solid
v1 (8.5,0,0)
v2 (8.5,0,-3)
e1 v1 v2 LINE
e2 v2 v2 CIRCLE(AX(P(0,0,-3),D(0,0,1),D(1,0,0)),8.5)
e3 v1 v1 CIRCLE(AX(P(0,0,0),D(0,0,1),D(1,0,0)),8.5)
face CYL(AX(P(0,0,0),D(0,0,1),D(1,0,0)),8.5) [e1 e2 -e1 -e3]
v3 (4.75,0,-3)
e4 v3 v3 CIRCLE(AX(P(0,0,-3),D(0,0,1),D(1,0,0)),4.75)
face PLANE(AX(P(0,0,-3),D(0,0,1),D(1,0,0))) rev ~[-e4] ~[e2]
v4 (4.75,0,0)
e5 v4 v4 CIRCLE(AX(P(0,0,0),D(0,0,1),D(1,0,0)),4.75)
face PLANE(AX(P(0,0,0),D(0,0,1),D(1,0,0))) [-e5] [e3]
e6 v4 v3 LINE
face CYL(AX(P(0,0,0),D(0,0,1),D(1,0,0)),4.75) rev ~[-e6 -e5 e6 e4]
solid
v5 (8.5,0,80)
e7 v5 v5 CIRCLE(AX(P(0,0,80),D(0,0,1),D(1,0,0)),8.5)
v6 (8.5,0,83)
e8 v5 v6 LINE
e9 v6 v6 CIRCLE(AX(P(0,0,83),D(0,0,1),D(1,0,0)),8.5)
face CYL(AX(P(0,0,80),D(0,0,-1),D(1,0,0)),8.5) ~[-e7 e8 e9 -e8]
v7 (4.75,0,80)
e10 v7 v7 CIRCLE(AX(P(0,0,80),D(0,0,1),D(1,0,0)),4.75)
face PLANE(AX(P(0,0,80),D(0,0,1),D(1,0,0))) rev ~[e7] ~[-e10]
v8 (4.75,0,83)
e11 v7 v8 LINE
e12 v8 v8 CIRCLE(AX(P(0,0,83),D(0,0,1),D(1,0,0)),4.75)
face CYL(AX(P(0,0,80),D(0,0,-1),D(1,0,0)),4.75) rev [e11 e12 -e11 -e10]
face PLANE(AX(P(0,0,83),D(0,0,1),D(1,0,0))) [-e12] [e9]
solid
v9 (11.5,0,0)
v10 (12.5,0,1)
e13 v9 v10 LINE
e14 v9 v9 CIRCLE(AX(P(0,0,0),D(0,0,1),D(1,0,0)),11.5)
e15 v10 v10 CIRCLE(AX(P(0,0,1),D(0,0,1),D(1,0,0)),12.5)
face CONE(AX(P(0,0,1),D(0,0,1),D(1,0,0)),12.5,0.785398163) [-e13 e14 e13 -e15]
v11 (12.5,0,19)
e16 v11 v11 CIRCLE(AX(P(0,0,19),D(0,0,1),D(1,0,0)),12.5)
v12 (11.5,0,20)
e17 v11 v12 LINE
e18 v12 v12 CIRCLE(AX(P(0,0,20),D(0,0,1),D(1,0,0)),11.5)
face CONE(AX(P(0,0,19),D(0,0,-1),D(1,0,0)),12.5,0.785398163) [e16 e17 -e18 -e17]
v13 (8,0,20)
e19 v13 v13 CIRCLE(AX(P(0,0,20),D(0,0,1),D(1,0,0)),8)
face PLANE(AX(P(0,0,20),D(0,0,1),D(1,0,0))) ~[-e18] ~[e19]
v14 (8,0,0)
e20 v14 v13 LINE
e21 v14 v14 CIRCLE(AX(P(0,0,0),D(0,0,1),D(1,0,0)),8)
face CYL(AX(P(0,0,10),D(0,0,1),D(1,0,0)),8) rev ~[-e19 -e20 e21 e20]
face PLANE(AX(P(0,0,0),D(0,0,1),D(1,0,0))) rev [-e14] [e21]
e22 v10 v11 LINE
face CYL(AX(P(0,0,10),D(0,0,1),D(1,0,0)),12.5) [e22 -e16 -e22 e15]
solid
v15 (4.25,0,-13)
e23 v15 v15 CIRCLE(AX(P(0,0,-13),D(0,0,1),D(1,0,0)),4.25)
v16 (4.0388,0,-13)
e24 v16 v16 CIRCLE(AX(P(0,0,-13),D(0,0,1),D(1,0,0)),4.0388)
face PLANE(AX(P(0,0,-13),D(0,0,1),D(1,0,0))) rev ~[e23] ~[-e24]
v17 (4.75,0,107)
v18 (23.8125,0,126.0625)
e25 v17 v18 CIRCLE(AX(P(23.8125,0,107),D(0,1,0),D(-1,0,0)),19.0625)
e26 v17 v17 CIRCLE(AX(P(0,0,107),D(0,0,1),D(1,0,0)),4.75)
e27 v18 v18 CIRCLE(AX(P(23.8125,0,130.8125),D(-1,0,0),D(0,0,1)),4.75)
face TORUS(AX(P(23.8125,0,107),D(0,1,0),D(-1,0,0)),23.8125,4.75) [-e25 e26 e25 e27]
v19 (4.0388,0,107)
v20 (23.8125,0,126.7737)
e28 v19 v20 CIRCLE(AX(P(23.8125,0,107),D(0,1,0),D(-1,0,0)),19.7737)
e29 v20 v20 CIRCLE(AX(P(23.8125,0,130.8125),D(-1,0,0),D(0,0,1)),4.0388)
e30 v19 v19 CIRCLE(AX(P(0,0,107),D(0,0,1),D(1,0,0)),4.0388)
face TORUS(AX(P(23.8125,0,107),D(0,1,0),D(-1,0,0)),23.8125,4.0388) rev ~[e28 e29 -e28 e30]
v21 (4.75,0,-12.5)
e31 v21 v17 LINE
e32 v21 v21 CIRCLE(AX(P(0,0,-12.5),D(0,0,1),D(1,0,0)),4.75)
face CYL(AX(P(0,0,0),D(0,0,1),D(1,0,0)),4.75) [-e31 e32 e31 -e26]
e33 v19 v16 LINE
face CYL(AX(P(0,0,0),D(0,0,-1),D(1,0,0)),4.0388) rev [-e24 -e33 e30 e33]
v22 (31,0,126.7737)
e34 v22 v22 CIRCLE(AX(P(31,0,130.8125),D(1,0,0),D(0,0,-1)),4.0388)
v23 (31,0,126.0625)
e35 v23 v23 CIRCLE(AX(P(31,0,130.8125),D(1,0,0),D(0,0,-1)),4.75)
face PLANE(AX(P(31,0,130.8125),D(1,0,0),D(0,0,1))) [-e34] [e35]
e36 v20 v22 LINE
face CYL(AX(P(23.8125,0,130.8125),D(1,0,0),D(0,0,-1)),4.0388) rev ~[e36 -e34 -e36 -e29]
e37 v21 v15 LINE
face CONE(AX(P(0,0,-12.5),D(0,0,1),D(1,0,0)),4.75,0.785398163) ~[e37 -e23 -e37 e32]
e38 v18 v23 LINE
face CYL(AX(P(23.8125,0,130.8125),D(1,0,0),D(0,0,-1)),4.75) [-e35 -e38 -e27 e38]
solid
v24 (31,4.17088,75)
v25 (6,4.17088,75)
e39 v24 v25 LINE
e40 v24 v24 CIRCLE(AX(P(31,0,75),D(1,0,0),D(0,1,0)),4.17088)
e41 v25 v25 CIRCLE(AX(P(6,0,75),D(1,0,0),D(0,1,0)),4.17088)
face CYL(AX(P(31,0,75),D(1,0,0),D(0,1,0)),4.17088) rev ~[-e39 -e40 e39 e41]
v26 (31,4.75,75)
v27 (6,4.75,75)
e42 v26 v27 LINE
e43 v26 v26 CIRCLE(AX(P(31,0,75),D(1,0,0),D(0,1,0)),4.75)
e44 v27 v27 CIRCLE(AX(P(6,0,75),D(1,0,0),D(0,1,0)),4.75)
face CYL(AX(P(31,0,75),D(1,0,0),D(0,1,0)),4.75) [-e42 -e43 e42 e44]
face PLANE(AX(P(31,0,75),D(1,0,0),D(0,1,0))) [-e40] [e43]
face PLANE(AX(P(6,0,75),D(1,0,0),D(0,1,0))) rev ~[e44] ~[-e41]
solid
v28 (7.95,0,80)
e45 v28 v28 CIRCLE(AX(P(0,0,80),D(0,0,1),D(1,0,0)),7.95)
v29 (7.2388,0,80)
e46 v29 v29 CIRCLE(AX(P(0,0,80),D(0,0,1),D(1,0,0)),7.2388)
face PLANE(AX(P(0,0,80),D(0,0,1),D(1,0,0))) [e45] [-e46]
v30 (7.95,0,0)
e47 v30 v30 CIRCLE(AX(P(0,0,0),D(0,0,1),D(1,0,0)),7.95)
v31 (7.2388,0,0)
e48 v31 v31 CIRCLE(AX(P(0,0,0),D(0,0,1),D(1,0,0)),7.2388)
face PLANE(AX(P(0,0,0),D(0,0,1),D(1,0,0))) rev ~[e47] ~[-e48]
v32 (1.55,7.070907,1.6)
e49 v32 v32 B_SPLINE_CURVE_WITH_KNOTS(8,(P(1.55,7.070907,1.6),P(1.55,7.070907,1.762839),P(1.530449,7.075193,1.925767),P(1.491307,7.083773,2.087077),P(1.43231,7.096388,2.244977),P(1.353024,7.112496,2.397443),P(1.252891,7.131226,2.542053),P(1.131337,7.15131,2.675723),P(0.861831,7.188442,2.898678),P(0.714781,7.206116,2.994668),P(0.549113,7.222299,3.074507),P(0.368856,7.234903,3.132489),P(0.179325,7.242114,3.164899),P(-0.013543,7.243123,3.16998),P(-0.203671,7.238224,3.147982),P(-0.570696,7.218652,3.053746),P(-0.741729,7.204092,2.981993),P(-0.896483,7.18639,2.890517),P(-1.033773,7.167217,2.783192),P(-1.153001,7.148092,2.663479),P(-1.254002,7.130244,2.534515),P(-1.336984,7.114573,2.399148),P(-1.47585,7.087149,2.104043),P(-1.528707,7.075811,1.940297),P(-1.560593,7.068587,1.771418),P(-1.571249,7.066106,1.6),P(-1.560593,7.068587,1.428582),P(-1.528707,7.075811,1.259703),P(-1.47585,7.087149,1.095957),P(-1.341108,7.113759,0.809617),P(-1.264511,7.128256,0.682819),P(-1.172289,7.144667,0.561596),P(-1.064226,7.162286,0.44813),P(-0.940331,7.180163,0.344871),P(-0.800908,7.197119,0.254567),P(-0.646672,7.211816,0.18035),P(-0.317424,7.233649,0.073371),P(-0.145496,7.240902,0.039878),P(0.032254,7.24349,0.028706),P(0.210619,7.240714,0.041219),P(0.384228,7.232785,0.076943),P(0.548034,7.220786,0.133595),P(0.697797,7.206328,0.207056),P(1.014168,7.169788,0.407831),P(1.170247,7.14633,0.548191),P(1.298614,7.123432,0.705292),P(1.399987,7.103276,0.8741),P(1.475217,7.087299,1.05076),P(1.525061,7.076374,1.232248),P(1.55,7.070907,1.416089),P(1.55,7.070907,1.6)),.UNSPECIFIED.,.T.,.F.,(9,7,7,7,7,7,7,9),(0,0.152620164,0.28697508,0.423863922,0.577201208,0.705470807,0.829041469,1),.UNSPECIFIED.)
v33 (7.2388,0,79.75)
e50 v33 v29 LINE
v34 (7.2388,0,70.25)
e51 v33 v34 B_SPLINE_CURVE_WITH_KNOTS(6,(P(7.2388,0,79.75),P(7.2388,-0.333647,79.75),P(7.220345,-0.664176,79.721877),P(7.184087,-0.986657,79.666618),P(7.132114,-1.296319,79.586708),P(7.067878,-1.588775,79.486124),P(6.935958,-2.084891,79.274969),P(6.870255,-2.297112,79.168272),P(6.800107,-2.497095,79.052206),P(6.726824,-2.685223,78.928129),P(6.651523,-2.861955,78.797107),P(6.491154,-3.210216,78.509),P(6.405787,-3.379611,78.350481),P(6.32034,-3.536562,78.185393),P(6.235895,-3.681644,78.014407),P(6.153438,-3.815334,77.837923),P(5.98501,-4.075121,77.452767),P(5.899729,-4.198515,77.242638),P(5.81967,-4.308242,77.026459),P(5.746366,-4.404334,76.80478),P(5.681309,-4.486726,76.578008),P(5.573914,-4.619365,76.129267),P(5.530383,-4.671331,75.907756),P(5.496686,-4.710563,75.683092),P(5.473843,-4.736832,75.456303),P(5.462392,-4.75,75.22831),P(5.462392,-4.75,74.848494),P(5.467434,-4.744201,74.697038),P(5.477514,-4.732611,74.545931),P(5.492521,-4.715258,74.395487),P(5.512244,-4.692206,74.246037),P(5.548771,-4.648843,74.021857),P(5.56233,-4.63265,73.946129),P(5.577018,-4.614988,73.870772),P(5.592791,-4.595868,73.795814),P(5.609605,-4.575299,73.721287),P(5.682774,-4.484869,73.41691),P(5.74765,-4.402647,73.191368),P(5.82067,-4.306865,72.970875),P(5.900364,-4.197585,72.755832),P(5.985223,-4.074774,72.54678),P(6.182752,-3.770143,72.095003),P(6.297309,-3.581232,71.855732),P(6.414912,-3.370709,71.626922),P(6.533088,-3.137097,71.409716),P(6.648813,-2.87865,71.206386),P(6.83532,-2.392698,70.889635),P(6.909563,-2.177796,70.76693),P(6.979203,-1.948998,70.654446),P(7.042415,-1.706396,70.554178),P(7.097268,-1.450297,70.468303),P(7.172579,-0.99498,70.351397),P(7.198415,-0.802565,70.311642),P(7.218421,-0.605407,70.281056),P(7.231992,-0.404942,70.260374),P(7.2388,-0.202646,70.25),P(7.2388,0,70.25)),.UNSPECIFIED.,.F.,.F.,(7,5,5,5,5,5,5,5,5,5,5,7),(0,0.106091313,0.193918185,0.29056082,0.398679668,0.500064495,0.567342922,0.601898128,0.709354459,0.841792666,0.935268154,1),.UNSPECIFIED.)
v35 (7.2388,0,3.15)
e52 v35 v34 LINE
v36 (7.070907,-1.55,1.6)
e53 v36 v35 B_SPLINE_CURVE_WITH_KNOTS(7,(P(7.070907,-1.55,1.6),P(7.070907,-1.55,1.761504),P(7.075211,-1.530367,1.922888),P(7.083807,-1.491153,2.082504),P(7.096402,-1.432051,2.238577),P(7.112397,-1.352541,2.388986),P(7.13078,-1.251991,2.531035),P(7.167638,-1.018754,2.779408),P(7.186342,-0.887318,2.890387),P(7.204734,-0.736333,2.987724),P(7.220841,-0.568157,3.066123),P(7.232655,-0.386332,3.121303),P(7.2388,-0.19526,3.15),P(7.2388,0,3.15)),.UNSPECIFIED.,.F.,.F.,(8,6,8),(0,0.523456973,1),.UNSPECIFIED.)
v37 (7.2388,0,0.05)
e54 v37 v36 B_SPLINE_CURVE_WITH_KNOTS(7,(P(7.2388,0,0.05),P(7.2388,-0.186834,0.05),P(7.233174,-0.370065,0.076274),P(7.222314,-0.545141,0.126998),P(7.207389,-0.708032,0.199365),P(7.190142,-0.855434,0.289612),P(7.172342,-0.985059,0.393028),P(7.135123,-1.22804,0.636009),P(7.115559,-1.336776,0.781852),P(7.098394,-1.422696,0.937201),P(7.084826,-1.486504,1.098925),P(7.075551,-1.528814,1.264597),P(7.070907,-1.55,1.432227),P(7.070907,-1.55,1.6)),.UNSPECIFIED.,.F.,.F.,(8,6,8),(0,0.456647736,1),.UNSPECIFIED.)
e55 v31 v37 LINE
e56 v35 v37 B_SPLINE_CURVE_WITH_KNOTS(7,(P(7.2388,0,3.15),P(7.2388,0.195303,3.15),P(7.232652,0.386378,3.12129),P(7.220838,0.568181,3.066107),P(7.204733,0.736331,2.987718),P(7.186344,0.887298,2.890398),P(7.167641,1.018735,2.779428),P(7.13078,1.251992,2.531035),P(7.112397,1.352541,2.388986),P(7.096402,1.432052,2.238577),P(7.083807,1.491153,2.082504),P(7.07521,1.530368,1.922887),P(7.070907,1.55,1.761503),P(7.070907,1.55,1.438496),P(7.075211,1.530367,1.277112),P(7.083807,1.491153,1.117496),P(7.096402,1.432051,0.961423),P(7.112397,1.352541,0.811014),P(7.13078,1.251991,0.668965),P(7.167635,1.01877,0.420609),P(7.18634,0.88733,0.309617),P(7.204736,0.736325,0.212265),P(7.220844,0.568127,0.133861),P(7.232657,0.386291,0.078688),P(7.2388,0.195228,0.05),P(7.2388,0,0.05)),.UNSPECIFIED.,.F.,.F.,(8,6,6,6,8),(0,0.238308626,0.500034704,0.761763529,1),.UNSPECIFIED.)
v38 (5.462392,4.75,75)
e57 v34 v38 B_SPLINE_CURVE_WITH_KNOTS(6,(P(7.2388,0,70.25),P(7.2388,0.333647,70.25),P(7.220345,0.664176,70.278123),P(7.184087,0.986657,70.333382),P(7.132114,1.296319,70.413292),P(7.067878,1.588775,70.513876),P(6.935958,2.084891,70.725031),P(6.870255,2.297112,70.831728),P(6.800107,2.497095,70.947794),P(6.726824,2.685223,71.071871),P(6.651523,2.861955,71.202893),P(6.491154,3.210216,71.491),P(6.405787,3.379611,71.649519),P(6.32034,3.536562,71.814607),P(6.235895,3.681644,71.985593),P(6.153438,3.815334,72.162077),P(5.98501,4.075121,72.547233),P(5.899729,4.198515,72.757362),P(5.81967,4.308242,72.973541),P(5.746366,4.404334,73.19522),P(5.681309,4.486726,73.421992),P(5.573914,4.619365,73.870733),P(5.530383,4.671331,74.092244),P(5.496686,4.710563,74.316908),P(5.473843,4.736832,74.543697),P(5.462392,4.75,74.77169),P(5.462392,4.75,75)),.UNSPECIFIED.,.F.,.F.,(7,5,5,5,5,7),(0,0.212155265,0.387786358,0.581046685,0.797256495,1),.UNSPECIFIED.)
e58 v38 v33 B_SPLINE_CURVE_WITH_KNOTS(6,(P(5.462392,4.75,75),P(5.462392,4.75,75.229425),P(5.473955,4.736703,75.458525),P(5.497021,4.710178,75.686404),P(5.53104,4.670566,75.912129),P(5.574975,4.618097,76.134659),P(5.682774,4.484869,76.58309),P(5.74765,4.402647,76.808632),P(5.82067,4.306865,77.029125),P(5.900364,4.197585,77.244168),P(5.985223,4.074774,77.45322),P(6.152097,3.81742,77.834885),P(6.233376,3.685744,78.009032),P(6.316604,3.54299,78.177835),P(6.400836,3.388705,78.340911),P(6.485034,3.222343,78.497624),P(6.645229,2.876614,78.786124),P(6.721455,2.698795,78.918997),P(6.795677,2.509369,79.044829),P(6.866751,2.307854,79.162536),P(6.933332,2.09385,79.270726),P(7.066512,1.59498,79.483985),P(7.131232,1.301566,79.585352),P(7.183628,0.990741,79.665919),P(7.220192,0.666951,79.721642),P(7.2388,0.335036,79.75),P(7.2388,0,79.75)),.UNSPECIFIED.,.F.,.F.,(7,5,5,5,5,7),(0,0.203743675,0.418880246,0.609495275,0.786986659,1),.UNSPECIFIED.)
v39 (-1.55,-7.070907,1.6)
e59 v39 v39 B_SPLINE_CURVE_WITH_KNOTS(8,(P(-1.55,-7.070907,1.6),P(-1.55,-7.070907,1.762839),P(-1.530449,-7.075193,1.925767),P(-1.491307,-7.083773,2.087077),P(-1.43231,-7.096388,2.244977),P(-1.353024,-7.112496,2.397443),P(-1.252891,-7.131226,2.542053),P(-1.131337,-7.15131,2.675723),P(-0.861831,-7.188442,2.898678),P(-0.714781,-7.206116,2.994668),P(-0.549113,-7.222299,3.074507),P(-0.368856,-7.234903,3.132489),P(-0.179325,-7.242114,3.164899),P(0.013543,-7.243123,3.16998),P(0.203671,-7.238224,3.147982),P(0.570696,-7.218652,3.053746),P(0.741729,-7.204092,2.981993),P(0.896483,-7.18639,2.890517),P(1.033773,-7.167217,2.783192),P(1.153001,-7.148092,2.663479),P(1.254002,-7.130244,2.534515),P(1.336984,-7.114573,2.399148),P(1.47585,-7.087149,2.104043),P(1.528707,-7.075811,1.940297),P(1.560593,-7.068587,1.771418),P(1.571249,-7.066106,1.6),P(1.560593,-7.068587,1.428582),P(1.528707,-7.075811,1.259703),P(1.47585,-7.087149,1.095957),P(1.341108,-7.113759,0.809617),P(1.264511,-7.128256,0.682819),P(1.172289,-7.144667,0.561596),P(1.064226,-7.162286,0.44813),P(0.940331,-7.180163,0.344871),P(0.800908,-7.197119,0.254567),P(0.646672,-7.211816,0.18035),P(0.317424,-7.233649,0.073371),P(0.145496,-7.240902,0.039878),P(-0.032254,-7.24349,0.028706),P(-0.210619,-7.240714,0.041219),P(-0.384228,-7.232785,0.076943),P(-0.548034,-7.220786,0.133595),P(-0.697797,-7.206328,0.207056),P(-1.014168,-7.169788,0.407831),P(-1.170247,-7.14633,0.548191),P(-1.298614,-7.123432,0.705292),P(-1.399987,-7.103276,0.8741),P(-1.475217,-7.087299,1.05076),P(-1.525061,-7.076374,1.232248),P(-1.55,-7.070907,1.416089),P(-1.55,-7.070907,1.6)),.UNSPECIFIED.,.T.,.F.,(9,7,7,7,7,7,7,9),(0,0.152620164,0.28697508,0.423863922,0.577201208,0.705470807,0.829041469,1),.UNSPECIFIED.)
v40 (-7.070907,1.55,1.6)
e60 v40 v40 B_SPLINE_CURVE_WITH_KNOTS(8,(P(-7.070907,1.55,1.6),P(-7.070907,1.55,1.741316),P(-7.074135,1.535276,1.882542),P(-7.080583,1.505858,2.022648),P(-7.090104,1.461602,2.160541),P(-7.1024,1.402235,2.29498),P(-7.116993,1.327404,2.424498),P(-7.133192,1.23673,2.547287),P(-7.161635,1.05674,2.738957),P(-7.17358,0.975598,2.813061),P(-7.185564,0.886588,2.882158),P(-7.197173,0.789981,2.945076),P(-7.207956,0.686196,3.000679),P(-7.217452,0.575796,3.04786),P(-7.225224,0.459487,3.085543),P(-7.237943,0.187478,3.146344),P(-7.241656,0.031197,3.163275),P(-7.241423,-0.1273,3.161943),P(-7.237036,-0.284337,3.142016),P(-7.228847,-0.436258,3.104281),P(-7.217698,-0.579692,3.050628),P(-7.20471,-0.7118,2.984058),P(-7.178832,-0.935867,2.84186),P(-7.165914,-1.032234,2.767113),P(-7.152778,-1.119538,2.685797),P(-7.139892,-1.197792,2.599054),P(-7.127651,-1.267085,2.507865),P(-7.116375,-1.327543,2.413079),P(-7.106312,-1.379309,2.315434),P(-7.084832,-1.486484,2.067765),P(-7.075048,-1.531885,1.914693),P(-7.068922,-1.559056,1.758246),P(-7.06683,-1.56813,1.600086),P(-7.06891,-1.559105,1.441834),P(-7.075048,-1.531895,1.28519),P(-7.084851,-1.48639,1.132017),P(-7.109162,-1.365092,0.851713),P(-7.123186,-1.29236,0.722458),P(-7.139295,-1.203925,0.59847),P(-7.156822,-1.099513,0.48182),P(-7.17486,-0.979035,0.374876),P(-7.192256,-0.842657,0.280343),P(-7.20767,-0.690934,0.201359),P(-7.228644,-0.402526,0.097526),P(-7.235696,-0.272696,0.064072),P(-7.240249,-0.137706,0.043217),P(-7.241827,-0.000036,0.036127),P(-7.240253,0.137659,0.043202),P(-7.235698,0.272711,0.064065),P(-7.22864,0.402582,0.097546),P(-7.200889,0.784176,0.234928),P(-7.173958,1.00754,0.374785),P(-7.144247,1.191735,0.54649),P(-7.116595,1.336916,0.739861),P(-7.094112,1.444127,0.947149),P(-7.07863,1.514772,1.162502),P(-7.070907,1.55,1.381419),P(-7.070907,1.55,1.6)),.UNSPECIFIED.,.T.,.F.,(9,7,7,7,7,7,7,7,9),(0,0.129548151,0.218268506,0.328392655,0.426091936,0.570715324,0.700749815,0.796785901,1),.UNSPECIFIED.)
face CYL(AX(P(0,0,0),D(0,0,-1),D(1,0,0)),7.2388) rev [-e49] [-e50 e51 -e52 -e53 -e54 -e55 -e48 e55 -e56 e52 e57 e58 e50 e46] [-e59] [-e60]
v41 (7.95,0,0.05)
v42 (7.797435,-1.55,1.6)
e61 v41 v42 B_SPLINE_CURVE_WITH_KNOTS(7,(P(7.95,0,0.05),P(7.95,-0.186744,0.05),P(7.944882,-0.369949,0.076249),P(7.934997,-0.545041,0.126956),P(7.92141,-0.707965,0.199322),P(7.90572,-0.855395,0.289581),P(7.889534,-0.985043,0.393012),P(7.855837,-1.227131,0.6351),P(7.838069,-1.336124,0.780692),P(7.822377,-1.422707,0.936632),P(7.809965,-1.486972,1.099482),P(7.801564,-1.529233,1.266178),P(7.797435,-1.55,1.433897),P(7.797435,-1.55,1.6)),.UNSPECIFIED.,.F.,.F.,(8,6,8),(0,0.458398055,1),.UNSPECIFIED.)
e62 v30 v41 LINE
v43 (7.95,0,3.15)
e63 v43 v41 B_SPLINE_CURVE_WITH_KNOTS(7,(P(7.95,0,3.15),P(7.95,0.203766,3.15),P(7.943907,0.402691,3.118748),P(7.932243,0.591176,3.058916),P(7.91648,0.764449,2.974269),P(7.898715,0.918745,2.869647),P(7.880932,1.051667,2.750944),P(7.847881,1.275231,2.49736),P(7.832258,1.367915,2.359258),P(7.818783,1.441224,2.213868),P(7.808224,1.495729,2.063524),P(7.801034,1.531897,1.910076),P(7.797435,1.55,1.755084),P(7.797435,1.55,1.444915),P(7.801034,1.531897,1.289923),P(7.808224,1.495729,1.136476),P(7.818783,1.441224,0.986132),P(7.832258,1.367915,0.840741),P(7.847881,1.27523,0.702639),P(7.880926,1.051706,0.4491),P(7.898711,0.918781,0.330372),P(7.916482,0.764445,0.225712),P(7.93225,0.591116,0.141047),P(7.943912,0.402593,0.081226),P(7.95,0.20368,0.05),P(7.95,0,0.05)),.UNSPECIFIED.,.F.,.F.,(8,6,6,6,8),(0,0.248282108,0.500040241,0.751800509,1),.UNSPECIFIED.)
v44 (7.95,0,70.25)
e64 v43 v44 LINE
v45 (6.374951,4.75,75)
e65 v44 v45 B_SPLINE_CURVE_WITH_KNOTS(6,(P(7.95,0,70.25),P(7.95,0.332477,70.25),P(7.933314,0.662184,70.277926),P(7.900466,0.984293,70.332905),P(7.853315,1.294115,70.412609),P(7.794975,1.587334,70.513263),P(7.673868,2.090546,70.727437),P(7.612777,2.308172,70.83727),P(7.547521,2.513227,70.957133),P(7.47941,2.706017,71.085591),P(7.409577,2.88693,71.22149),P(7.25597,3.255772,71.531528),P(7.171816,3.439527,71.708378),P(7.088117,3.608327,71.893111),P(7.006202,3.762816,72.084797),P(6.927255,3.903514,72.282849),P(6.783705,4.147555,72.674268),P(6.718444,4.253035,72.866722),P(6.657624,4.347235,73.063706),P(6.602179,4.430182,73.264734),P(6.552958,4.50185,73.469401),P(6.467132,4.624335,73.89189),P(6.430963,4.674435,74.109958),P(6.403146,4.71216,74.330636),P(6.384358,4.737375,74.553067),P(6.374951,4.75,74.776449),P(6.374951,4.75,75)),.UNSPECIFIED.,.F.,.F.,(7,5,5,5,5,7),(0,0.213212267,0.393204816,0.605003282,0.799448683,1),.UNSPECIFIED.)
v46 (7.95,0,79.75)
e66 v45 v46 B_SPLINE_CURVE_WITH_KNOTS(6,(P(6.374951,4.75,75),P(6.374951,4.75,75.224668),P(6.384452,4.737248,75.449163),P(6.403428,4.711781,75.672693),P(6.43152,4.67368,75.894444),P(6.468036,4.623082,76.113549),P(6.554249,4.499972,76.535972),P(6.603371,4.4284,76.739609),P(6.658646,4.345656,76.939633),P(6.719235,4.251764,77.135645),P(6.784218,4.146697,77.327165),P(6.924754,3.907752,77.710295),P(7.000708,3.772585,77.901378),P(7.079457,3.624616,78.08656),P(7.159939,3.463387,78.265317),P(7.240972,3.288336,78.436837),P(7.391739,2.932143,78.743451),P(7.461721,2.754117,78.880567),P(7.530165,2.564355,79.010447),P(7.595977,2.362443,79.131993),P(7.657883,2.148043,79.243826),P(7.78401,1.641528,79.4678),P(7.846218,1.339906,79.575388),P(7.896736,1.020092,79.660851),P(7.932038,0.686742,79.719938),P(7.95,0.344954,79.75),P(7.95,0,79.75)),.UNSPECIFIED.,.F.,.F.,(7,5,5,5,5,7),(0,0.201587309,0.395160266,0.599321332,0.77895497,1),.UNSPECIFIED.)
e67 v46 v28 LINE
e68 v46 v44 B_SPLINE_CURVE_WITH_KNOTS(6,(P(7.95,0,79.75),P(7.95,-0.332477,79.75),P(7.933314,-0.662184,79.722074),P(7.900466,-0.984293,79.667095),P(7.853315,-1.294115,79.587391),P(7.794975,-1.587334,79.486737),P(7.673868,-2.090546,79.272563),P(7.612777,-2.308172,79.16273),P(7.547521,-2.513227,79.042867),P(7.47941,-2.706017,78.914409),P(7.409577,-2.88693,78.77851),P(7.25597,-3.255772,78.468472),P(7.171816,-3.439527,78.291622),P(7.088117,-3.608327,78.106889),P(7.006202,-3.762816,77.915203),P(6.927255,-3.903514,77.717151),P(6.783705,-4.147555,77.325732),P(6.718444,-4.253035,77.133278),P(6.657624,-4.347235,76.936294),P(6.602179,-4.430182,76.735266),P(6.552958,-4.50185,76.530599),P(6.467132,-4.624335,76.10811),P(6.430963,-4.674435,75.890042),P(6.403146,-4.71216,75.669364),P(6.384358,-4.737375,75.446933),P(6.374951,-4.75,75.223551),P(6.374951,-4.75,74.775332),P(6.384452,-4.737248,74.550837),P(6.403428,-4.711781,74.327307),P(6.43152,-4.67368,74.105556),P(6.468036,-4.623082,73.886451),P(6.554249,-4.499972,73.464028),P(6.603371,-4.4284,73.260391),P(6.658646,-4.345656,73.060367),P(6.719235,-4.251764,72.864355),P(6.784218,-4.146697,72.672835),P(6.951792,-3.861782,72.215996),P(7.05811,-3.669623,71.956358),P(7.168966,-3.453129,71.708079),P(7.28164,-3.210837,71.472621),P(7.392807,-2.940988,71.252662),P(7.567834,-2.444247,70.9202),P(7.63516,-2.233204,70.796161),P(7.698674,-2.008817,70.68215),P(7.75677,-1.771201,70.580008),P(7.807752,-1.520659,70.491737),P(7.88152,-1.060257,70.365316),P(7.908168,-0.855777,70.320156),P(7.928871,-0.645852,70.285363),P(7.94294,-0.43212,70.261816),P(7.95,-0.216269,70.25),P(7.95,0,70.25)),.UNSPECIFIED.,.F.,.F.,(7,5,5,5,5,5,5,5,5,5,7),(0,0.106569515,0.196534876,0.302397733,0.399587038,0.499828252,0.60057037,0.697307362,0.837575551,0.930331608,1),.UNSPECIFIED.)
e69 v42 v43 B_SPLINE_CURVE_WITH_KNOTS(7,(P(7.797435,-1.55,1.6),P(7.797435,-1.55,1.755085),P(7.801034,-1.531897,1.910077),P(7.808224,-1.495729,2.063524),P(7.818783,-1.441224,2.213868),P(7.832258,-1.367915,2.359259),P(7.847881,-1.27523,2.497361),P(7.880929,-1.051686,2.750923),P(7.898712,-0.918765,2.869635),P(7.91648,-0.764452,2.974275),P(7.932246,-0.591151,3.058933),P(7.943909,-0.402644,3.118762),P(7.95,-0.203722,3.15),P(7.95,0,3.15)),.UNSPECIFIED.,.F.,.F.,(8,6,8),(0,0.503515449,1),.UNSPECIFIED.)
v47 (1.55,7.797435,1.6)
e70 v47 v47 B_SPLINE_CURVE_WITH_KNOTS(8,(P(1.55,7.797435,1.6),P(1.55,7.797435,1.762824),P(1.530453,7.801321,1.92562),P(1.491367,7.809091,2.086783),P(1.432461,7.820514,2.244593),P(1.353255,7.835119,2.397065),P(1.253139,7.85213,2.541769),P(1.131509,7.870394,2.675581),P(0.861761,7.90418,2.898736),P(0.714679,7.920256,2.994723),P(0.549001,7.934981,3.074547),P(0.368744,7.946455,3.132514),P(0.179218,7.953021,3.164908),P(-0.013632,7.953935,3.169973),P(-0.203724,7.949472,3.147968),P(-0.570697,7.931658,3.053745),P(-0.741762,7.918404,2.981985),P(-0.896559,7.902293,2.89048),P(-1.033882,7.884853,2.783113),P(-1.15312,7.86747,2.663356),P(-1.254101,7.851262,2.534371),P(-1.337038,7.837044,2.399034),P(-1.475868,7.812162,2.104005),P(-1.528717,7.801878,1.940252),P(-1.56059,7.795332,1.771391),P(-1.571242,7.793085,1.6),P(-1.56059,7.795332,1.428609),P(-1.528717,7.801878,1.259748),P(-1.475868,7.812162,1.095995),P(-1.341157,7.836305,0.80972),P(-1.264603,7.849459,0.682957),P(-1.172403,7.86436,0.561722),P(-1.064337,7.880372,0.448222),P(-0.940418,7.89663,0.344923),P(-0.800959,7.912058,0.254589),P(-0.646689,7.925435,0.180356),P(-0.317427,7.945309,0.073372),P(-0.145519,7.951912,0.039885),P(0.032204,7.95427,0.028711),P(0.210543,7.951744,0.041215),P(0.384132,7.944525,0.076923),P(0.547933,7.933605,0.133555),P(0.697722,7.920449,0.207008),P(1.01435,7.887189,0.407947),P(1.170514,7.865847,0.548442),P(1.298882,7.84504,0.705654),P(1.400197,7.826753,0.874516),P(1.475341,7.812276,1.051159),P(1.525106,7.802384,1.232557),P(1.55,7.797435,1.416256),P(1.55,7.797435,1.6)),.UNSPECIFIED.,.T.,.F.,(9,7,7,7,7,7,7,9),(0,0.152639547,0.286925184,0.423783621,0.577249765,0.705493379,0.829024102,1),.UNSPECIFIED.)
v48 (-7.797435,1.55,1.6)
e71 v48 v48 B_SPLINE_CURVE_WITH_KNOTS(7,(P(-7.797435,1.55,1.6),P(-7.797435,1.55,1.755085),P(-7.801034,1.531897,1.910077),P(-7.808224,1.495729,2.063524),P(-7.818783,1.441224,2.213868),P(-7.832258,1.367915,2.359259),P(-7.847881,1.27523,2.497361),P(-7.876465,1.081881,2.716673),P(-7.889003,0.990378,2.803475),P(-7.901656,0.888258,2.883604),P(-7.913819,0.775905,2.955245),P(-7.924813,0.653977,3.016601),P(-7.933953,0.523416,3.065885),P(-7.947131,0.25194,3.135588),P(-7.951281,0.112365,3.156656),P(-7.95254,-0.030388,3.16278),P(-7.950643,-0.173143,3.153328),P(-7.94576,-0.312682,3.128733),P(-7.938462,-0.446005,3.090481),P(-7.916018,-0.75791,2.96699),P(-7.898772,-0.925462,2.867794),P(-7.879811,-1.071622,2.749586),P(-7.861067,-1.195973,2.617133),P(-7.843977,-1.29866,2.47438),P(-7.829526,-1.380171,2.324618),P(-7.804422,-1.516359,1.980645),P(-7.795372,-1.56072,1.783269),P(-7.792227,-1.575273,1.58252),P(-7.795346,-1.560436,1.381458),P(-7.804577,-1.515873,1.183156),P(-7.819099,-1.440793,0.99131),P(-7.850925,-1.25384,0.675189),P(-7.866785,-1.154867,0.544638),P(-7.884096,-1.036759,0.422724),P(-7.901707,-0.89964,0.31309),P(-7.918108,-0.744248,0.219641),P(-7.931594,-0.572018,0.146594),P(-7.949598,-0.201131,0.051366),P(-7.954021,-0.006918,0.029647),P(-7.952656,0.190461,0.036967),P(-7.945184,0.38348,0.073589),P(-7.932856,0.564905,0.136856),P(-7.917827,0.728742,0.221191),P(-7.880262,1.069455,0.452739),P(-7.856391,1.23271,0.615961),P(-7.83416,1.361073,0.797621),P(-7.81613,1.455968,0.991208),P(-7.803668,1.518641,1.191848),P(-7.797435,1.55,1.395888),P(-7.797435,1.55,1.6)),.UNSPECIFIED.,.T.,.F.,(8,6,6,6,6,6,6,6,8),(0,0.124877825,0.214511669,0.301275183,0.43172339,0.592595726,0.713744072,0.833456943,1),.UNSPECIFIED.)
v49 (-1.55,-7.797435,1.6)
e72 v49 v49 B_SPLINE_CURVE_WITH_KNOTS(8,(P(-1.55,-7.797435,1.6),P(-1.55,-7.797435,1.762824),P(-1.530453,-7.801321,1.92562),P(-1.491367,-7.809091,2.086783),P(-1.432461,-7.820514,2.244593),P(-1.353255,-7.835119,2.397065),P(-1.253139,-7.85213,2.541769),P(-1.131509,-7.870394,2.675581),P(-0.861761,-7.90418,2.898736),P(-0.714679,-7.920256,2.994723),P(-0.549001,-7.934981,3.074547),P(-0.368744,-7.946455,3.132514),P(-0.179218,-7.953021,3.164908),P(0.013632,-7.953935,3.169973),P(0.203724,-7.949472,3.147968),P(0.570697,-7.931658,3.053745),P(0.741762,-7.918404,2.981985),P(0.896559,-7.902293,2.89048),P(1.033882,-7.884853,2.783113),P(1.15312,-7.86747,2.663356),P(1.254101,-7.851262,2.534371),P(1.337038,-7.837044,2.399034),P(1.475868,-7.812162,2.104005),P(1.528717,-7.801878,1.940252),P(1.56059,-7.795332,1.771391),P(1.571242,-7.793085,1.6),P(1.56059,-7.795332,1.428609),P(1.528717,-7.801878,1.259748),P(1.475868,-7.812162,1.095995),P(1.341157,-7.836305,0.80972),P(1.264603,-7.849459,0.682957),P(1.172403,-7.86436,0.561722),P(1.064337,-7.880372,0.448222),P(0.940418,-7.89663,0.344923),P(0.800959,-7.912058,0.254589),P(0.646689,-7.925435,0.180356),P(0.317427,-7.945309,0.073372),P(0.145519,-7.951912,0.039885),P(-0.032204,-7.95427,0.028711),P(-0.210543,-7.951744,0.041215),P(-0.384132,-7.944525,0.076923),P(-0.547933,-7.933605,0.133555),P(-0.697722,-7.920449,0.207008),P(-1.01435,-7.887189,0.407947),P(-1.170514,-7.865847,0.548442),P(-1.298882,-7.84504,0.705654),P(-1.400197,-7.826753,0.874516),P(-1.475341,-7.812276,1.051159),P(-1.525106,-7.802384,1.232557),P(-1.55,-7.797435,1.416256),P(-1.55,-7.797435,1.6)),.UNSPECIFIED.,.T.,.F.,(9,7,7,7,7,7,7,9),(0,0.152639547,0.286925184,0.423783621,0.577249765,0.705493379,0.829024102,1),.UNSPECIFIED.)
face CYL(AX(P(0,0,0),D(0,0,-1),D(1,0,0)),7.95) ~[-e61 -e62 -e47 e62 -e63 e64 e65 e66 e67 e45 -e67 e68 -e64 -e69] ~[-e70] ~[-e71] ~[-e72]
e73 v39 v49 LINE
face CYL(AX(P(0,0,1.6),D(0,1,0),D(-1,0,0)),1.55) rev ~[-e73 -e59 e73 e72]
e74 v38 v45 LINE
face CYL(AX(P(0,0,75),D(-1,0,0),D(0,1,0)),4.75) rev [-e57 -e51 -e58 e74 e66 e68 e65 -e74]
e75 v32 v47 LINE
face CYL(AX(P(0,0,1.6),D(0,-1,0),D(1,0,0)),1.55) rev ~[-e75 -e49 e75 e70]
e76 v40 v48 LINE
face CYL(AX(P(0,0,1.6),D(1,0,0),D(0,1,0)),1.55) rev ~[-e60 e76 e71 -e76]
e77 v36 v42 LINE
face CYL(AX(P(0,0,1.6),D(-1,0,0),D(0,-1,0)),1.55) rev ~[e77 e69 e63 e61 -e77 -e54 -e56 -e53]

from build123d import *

# Parameters (mm, degrees)
F0_R          = 4.75
F0_R_2        = 4.0388
F1_DEPTH      = 107
F1_DEPTH_BACK = 13
F0_R_3        = 7.95
F0_R_4        = 7.2388
F2_DEPTH      = 80
F0_R_5        = 8.5
F3_DEPTH      = 3
F4_W          = 4.5
F4_H          = 20
F6_R          = 1.55
F7_DEPTH      = 12.501
F8_COUNT      = 4
F9_SIZE       = 0.5
F10_R         = 8.5
F10_R_2       = 4.75
F11_DEPTH     = 3
F12_R         = 4.75
F13_DEPTH     = 12.501
F15_R         = 4.75
F15_R_2       = 4.17088
F16_DEPTH     = 25
F18_SIZE      = 1
F1_FACE_R     = 4.75
F1_FACE_R_2   = 4.0388


with BuildPart() as f1:
    # F0 (on Top) → F1 (new body, two sides)
    with BuildSketch(Plane.XY) as f1_sk:
        Circle(F0_R)
        Circle(F0_R_2, mode=Mode.SUBTRACT)
    extrude(amount=F1_DEPTH)
    extrude(f1_sk.sketch, amount=-F1_DEPTH_BACK)

    # F9
    f9_edges = [f1.edges().sort_by_distance(p)[0] for p in [
        (-4.75, 0, -13),
    ]]
    chamfer(f9_edges, length=F9_SIZE)

    # F20: sweep along a path in F19
    with BuildLine(Plane.XZ) as f20_path:
        ThreePointArc((0, 107), (6.974519773, 123.837980227), (23.8125, 130.8125))
        Line((23.8125, 130.8125), (31, 130.8125))
    # F1_face (on face) → F20 (sweep)
    with BuildSketch(Plane.XY.offset(107)):
        Circle(F1_FACE_R)
        Circle(F1_FACE_R_2, mode=Mode.SUBTRACT)
    sweep(path=f20_path.line)


with BuildPart() as f2:
    # F0 (on Top) → F2 (new body)
    with BuildSketch(Plane.XY):
        Circle(F0_R_3)
        Circle(F0_R_4, mode=Mode.SUBTRACT)
    extrude(amount=F2_DEPTH)

    # F6 (on Front) → F7 (cut, through all)
    with BuildSketch(Plane.XZ):
        with Locations((0, 1.6)):
            Circle(F6_R)
    f7 = extrude(amount=-F7_DEPTH, mode=Mode.SUBTRACT)

    # F8: F7 ×4 about axis
    f8_axis = Axis((0, 0, 0), (0, 0, -1))
    for i in range(1, F8_COUNT):
        add(f7.rotate(f8_axis, i * 360 / F8_COUNT), mode=Mode.SUBTRACT)

    # F12 (on Right) → F13 (cut, through all)
    with BuildSketch(Plane.YZ):
        with Locations((0, 75)):
            Circle(F12_R)
    extrude(amount=F13_DEPTH, mode=Mode.SUBTRACT)


with BuildPart() as f3:
    # F0 (on Top) → F3 (new body)
    with BuildSketch(Plane.XY):
        Circle(F0_R_5)
        Circle(F0_R_3, mode=Mode.SUBTRACT)
        Circle(F0_R_3)
        Circle(F0_R_4, mode=Mode.SUBTRACT)
        Circle(F0_R_4)
        Circle(F0_R, mode=Mode.SUBTRACT)
    extrude(amount=-F3_DEPTH)


with BuildPart() as f5:
    # F4 (on Front) → F5 (revolve)
    with BuildSketch(Plane.XZ):
        with Locations((10.25, 10)):
            Rectangle(F4_W, F4_H)
    revolve(axis=Axis((0, 0, 8.3533200433), (0, 0, 1)))

    # F18
    f18_edges = [f5.edges().sort_by_distance(p)[0] for p in [
        (-12.5, 0, 0),
        (-12.5, 0, 20),
    ]]
    chamfer(f18_edges, length=F18_SIZE)


with BuildPart() as f11:
    # F10 (on face) → F11 (new body)
    with BuildSketch(Plane.XY.offset(80)):
        Circle(F10_R)
        Circle(F10_R_2, mode=Mode.SUBTRACT)
    extrude(amount=F11_DEPTH)


with BuildPart() as f16:
    # F15 (on offset) → F16 (new body)
    with BuildSketch(Plane.YZ.offset(31)):
        with Locations((0, 75)):
            Circle(F15_R)
        with Locations((0, 75)):
            Circle(F15_R_2, mode=Mode.SUBTRACT)
    extrude(amount=-F16_DEPTH)


solid = Compound([f1.part, f2.part, f3.part, f5.part, f11.part, f16.part])
